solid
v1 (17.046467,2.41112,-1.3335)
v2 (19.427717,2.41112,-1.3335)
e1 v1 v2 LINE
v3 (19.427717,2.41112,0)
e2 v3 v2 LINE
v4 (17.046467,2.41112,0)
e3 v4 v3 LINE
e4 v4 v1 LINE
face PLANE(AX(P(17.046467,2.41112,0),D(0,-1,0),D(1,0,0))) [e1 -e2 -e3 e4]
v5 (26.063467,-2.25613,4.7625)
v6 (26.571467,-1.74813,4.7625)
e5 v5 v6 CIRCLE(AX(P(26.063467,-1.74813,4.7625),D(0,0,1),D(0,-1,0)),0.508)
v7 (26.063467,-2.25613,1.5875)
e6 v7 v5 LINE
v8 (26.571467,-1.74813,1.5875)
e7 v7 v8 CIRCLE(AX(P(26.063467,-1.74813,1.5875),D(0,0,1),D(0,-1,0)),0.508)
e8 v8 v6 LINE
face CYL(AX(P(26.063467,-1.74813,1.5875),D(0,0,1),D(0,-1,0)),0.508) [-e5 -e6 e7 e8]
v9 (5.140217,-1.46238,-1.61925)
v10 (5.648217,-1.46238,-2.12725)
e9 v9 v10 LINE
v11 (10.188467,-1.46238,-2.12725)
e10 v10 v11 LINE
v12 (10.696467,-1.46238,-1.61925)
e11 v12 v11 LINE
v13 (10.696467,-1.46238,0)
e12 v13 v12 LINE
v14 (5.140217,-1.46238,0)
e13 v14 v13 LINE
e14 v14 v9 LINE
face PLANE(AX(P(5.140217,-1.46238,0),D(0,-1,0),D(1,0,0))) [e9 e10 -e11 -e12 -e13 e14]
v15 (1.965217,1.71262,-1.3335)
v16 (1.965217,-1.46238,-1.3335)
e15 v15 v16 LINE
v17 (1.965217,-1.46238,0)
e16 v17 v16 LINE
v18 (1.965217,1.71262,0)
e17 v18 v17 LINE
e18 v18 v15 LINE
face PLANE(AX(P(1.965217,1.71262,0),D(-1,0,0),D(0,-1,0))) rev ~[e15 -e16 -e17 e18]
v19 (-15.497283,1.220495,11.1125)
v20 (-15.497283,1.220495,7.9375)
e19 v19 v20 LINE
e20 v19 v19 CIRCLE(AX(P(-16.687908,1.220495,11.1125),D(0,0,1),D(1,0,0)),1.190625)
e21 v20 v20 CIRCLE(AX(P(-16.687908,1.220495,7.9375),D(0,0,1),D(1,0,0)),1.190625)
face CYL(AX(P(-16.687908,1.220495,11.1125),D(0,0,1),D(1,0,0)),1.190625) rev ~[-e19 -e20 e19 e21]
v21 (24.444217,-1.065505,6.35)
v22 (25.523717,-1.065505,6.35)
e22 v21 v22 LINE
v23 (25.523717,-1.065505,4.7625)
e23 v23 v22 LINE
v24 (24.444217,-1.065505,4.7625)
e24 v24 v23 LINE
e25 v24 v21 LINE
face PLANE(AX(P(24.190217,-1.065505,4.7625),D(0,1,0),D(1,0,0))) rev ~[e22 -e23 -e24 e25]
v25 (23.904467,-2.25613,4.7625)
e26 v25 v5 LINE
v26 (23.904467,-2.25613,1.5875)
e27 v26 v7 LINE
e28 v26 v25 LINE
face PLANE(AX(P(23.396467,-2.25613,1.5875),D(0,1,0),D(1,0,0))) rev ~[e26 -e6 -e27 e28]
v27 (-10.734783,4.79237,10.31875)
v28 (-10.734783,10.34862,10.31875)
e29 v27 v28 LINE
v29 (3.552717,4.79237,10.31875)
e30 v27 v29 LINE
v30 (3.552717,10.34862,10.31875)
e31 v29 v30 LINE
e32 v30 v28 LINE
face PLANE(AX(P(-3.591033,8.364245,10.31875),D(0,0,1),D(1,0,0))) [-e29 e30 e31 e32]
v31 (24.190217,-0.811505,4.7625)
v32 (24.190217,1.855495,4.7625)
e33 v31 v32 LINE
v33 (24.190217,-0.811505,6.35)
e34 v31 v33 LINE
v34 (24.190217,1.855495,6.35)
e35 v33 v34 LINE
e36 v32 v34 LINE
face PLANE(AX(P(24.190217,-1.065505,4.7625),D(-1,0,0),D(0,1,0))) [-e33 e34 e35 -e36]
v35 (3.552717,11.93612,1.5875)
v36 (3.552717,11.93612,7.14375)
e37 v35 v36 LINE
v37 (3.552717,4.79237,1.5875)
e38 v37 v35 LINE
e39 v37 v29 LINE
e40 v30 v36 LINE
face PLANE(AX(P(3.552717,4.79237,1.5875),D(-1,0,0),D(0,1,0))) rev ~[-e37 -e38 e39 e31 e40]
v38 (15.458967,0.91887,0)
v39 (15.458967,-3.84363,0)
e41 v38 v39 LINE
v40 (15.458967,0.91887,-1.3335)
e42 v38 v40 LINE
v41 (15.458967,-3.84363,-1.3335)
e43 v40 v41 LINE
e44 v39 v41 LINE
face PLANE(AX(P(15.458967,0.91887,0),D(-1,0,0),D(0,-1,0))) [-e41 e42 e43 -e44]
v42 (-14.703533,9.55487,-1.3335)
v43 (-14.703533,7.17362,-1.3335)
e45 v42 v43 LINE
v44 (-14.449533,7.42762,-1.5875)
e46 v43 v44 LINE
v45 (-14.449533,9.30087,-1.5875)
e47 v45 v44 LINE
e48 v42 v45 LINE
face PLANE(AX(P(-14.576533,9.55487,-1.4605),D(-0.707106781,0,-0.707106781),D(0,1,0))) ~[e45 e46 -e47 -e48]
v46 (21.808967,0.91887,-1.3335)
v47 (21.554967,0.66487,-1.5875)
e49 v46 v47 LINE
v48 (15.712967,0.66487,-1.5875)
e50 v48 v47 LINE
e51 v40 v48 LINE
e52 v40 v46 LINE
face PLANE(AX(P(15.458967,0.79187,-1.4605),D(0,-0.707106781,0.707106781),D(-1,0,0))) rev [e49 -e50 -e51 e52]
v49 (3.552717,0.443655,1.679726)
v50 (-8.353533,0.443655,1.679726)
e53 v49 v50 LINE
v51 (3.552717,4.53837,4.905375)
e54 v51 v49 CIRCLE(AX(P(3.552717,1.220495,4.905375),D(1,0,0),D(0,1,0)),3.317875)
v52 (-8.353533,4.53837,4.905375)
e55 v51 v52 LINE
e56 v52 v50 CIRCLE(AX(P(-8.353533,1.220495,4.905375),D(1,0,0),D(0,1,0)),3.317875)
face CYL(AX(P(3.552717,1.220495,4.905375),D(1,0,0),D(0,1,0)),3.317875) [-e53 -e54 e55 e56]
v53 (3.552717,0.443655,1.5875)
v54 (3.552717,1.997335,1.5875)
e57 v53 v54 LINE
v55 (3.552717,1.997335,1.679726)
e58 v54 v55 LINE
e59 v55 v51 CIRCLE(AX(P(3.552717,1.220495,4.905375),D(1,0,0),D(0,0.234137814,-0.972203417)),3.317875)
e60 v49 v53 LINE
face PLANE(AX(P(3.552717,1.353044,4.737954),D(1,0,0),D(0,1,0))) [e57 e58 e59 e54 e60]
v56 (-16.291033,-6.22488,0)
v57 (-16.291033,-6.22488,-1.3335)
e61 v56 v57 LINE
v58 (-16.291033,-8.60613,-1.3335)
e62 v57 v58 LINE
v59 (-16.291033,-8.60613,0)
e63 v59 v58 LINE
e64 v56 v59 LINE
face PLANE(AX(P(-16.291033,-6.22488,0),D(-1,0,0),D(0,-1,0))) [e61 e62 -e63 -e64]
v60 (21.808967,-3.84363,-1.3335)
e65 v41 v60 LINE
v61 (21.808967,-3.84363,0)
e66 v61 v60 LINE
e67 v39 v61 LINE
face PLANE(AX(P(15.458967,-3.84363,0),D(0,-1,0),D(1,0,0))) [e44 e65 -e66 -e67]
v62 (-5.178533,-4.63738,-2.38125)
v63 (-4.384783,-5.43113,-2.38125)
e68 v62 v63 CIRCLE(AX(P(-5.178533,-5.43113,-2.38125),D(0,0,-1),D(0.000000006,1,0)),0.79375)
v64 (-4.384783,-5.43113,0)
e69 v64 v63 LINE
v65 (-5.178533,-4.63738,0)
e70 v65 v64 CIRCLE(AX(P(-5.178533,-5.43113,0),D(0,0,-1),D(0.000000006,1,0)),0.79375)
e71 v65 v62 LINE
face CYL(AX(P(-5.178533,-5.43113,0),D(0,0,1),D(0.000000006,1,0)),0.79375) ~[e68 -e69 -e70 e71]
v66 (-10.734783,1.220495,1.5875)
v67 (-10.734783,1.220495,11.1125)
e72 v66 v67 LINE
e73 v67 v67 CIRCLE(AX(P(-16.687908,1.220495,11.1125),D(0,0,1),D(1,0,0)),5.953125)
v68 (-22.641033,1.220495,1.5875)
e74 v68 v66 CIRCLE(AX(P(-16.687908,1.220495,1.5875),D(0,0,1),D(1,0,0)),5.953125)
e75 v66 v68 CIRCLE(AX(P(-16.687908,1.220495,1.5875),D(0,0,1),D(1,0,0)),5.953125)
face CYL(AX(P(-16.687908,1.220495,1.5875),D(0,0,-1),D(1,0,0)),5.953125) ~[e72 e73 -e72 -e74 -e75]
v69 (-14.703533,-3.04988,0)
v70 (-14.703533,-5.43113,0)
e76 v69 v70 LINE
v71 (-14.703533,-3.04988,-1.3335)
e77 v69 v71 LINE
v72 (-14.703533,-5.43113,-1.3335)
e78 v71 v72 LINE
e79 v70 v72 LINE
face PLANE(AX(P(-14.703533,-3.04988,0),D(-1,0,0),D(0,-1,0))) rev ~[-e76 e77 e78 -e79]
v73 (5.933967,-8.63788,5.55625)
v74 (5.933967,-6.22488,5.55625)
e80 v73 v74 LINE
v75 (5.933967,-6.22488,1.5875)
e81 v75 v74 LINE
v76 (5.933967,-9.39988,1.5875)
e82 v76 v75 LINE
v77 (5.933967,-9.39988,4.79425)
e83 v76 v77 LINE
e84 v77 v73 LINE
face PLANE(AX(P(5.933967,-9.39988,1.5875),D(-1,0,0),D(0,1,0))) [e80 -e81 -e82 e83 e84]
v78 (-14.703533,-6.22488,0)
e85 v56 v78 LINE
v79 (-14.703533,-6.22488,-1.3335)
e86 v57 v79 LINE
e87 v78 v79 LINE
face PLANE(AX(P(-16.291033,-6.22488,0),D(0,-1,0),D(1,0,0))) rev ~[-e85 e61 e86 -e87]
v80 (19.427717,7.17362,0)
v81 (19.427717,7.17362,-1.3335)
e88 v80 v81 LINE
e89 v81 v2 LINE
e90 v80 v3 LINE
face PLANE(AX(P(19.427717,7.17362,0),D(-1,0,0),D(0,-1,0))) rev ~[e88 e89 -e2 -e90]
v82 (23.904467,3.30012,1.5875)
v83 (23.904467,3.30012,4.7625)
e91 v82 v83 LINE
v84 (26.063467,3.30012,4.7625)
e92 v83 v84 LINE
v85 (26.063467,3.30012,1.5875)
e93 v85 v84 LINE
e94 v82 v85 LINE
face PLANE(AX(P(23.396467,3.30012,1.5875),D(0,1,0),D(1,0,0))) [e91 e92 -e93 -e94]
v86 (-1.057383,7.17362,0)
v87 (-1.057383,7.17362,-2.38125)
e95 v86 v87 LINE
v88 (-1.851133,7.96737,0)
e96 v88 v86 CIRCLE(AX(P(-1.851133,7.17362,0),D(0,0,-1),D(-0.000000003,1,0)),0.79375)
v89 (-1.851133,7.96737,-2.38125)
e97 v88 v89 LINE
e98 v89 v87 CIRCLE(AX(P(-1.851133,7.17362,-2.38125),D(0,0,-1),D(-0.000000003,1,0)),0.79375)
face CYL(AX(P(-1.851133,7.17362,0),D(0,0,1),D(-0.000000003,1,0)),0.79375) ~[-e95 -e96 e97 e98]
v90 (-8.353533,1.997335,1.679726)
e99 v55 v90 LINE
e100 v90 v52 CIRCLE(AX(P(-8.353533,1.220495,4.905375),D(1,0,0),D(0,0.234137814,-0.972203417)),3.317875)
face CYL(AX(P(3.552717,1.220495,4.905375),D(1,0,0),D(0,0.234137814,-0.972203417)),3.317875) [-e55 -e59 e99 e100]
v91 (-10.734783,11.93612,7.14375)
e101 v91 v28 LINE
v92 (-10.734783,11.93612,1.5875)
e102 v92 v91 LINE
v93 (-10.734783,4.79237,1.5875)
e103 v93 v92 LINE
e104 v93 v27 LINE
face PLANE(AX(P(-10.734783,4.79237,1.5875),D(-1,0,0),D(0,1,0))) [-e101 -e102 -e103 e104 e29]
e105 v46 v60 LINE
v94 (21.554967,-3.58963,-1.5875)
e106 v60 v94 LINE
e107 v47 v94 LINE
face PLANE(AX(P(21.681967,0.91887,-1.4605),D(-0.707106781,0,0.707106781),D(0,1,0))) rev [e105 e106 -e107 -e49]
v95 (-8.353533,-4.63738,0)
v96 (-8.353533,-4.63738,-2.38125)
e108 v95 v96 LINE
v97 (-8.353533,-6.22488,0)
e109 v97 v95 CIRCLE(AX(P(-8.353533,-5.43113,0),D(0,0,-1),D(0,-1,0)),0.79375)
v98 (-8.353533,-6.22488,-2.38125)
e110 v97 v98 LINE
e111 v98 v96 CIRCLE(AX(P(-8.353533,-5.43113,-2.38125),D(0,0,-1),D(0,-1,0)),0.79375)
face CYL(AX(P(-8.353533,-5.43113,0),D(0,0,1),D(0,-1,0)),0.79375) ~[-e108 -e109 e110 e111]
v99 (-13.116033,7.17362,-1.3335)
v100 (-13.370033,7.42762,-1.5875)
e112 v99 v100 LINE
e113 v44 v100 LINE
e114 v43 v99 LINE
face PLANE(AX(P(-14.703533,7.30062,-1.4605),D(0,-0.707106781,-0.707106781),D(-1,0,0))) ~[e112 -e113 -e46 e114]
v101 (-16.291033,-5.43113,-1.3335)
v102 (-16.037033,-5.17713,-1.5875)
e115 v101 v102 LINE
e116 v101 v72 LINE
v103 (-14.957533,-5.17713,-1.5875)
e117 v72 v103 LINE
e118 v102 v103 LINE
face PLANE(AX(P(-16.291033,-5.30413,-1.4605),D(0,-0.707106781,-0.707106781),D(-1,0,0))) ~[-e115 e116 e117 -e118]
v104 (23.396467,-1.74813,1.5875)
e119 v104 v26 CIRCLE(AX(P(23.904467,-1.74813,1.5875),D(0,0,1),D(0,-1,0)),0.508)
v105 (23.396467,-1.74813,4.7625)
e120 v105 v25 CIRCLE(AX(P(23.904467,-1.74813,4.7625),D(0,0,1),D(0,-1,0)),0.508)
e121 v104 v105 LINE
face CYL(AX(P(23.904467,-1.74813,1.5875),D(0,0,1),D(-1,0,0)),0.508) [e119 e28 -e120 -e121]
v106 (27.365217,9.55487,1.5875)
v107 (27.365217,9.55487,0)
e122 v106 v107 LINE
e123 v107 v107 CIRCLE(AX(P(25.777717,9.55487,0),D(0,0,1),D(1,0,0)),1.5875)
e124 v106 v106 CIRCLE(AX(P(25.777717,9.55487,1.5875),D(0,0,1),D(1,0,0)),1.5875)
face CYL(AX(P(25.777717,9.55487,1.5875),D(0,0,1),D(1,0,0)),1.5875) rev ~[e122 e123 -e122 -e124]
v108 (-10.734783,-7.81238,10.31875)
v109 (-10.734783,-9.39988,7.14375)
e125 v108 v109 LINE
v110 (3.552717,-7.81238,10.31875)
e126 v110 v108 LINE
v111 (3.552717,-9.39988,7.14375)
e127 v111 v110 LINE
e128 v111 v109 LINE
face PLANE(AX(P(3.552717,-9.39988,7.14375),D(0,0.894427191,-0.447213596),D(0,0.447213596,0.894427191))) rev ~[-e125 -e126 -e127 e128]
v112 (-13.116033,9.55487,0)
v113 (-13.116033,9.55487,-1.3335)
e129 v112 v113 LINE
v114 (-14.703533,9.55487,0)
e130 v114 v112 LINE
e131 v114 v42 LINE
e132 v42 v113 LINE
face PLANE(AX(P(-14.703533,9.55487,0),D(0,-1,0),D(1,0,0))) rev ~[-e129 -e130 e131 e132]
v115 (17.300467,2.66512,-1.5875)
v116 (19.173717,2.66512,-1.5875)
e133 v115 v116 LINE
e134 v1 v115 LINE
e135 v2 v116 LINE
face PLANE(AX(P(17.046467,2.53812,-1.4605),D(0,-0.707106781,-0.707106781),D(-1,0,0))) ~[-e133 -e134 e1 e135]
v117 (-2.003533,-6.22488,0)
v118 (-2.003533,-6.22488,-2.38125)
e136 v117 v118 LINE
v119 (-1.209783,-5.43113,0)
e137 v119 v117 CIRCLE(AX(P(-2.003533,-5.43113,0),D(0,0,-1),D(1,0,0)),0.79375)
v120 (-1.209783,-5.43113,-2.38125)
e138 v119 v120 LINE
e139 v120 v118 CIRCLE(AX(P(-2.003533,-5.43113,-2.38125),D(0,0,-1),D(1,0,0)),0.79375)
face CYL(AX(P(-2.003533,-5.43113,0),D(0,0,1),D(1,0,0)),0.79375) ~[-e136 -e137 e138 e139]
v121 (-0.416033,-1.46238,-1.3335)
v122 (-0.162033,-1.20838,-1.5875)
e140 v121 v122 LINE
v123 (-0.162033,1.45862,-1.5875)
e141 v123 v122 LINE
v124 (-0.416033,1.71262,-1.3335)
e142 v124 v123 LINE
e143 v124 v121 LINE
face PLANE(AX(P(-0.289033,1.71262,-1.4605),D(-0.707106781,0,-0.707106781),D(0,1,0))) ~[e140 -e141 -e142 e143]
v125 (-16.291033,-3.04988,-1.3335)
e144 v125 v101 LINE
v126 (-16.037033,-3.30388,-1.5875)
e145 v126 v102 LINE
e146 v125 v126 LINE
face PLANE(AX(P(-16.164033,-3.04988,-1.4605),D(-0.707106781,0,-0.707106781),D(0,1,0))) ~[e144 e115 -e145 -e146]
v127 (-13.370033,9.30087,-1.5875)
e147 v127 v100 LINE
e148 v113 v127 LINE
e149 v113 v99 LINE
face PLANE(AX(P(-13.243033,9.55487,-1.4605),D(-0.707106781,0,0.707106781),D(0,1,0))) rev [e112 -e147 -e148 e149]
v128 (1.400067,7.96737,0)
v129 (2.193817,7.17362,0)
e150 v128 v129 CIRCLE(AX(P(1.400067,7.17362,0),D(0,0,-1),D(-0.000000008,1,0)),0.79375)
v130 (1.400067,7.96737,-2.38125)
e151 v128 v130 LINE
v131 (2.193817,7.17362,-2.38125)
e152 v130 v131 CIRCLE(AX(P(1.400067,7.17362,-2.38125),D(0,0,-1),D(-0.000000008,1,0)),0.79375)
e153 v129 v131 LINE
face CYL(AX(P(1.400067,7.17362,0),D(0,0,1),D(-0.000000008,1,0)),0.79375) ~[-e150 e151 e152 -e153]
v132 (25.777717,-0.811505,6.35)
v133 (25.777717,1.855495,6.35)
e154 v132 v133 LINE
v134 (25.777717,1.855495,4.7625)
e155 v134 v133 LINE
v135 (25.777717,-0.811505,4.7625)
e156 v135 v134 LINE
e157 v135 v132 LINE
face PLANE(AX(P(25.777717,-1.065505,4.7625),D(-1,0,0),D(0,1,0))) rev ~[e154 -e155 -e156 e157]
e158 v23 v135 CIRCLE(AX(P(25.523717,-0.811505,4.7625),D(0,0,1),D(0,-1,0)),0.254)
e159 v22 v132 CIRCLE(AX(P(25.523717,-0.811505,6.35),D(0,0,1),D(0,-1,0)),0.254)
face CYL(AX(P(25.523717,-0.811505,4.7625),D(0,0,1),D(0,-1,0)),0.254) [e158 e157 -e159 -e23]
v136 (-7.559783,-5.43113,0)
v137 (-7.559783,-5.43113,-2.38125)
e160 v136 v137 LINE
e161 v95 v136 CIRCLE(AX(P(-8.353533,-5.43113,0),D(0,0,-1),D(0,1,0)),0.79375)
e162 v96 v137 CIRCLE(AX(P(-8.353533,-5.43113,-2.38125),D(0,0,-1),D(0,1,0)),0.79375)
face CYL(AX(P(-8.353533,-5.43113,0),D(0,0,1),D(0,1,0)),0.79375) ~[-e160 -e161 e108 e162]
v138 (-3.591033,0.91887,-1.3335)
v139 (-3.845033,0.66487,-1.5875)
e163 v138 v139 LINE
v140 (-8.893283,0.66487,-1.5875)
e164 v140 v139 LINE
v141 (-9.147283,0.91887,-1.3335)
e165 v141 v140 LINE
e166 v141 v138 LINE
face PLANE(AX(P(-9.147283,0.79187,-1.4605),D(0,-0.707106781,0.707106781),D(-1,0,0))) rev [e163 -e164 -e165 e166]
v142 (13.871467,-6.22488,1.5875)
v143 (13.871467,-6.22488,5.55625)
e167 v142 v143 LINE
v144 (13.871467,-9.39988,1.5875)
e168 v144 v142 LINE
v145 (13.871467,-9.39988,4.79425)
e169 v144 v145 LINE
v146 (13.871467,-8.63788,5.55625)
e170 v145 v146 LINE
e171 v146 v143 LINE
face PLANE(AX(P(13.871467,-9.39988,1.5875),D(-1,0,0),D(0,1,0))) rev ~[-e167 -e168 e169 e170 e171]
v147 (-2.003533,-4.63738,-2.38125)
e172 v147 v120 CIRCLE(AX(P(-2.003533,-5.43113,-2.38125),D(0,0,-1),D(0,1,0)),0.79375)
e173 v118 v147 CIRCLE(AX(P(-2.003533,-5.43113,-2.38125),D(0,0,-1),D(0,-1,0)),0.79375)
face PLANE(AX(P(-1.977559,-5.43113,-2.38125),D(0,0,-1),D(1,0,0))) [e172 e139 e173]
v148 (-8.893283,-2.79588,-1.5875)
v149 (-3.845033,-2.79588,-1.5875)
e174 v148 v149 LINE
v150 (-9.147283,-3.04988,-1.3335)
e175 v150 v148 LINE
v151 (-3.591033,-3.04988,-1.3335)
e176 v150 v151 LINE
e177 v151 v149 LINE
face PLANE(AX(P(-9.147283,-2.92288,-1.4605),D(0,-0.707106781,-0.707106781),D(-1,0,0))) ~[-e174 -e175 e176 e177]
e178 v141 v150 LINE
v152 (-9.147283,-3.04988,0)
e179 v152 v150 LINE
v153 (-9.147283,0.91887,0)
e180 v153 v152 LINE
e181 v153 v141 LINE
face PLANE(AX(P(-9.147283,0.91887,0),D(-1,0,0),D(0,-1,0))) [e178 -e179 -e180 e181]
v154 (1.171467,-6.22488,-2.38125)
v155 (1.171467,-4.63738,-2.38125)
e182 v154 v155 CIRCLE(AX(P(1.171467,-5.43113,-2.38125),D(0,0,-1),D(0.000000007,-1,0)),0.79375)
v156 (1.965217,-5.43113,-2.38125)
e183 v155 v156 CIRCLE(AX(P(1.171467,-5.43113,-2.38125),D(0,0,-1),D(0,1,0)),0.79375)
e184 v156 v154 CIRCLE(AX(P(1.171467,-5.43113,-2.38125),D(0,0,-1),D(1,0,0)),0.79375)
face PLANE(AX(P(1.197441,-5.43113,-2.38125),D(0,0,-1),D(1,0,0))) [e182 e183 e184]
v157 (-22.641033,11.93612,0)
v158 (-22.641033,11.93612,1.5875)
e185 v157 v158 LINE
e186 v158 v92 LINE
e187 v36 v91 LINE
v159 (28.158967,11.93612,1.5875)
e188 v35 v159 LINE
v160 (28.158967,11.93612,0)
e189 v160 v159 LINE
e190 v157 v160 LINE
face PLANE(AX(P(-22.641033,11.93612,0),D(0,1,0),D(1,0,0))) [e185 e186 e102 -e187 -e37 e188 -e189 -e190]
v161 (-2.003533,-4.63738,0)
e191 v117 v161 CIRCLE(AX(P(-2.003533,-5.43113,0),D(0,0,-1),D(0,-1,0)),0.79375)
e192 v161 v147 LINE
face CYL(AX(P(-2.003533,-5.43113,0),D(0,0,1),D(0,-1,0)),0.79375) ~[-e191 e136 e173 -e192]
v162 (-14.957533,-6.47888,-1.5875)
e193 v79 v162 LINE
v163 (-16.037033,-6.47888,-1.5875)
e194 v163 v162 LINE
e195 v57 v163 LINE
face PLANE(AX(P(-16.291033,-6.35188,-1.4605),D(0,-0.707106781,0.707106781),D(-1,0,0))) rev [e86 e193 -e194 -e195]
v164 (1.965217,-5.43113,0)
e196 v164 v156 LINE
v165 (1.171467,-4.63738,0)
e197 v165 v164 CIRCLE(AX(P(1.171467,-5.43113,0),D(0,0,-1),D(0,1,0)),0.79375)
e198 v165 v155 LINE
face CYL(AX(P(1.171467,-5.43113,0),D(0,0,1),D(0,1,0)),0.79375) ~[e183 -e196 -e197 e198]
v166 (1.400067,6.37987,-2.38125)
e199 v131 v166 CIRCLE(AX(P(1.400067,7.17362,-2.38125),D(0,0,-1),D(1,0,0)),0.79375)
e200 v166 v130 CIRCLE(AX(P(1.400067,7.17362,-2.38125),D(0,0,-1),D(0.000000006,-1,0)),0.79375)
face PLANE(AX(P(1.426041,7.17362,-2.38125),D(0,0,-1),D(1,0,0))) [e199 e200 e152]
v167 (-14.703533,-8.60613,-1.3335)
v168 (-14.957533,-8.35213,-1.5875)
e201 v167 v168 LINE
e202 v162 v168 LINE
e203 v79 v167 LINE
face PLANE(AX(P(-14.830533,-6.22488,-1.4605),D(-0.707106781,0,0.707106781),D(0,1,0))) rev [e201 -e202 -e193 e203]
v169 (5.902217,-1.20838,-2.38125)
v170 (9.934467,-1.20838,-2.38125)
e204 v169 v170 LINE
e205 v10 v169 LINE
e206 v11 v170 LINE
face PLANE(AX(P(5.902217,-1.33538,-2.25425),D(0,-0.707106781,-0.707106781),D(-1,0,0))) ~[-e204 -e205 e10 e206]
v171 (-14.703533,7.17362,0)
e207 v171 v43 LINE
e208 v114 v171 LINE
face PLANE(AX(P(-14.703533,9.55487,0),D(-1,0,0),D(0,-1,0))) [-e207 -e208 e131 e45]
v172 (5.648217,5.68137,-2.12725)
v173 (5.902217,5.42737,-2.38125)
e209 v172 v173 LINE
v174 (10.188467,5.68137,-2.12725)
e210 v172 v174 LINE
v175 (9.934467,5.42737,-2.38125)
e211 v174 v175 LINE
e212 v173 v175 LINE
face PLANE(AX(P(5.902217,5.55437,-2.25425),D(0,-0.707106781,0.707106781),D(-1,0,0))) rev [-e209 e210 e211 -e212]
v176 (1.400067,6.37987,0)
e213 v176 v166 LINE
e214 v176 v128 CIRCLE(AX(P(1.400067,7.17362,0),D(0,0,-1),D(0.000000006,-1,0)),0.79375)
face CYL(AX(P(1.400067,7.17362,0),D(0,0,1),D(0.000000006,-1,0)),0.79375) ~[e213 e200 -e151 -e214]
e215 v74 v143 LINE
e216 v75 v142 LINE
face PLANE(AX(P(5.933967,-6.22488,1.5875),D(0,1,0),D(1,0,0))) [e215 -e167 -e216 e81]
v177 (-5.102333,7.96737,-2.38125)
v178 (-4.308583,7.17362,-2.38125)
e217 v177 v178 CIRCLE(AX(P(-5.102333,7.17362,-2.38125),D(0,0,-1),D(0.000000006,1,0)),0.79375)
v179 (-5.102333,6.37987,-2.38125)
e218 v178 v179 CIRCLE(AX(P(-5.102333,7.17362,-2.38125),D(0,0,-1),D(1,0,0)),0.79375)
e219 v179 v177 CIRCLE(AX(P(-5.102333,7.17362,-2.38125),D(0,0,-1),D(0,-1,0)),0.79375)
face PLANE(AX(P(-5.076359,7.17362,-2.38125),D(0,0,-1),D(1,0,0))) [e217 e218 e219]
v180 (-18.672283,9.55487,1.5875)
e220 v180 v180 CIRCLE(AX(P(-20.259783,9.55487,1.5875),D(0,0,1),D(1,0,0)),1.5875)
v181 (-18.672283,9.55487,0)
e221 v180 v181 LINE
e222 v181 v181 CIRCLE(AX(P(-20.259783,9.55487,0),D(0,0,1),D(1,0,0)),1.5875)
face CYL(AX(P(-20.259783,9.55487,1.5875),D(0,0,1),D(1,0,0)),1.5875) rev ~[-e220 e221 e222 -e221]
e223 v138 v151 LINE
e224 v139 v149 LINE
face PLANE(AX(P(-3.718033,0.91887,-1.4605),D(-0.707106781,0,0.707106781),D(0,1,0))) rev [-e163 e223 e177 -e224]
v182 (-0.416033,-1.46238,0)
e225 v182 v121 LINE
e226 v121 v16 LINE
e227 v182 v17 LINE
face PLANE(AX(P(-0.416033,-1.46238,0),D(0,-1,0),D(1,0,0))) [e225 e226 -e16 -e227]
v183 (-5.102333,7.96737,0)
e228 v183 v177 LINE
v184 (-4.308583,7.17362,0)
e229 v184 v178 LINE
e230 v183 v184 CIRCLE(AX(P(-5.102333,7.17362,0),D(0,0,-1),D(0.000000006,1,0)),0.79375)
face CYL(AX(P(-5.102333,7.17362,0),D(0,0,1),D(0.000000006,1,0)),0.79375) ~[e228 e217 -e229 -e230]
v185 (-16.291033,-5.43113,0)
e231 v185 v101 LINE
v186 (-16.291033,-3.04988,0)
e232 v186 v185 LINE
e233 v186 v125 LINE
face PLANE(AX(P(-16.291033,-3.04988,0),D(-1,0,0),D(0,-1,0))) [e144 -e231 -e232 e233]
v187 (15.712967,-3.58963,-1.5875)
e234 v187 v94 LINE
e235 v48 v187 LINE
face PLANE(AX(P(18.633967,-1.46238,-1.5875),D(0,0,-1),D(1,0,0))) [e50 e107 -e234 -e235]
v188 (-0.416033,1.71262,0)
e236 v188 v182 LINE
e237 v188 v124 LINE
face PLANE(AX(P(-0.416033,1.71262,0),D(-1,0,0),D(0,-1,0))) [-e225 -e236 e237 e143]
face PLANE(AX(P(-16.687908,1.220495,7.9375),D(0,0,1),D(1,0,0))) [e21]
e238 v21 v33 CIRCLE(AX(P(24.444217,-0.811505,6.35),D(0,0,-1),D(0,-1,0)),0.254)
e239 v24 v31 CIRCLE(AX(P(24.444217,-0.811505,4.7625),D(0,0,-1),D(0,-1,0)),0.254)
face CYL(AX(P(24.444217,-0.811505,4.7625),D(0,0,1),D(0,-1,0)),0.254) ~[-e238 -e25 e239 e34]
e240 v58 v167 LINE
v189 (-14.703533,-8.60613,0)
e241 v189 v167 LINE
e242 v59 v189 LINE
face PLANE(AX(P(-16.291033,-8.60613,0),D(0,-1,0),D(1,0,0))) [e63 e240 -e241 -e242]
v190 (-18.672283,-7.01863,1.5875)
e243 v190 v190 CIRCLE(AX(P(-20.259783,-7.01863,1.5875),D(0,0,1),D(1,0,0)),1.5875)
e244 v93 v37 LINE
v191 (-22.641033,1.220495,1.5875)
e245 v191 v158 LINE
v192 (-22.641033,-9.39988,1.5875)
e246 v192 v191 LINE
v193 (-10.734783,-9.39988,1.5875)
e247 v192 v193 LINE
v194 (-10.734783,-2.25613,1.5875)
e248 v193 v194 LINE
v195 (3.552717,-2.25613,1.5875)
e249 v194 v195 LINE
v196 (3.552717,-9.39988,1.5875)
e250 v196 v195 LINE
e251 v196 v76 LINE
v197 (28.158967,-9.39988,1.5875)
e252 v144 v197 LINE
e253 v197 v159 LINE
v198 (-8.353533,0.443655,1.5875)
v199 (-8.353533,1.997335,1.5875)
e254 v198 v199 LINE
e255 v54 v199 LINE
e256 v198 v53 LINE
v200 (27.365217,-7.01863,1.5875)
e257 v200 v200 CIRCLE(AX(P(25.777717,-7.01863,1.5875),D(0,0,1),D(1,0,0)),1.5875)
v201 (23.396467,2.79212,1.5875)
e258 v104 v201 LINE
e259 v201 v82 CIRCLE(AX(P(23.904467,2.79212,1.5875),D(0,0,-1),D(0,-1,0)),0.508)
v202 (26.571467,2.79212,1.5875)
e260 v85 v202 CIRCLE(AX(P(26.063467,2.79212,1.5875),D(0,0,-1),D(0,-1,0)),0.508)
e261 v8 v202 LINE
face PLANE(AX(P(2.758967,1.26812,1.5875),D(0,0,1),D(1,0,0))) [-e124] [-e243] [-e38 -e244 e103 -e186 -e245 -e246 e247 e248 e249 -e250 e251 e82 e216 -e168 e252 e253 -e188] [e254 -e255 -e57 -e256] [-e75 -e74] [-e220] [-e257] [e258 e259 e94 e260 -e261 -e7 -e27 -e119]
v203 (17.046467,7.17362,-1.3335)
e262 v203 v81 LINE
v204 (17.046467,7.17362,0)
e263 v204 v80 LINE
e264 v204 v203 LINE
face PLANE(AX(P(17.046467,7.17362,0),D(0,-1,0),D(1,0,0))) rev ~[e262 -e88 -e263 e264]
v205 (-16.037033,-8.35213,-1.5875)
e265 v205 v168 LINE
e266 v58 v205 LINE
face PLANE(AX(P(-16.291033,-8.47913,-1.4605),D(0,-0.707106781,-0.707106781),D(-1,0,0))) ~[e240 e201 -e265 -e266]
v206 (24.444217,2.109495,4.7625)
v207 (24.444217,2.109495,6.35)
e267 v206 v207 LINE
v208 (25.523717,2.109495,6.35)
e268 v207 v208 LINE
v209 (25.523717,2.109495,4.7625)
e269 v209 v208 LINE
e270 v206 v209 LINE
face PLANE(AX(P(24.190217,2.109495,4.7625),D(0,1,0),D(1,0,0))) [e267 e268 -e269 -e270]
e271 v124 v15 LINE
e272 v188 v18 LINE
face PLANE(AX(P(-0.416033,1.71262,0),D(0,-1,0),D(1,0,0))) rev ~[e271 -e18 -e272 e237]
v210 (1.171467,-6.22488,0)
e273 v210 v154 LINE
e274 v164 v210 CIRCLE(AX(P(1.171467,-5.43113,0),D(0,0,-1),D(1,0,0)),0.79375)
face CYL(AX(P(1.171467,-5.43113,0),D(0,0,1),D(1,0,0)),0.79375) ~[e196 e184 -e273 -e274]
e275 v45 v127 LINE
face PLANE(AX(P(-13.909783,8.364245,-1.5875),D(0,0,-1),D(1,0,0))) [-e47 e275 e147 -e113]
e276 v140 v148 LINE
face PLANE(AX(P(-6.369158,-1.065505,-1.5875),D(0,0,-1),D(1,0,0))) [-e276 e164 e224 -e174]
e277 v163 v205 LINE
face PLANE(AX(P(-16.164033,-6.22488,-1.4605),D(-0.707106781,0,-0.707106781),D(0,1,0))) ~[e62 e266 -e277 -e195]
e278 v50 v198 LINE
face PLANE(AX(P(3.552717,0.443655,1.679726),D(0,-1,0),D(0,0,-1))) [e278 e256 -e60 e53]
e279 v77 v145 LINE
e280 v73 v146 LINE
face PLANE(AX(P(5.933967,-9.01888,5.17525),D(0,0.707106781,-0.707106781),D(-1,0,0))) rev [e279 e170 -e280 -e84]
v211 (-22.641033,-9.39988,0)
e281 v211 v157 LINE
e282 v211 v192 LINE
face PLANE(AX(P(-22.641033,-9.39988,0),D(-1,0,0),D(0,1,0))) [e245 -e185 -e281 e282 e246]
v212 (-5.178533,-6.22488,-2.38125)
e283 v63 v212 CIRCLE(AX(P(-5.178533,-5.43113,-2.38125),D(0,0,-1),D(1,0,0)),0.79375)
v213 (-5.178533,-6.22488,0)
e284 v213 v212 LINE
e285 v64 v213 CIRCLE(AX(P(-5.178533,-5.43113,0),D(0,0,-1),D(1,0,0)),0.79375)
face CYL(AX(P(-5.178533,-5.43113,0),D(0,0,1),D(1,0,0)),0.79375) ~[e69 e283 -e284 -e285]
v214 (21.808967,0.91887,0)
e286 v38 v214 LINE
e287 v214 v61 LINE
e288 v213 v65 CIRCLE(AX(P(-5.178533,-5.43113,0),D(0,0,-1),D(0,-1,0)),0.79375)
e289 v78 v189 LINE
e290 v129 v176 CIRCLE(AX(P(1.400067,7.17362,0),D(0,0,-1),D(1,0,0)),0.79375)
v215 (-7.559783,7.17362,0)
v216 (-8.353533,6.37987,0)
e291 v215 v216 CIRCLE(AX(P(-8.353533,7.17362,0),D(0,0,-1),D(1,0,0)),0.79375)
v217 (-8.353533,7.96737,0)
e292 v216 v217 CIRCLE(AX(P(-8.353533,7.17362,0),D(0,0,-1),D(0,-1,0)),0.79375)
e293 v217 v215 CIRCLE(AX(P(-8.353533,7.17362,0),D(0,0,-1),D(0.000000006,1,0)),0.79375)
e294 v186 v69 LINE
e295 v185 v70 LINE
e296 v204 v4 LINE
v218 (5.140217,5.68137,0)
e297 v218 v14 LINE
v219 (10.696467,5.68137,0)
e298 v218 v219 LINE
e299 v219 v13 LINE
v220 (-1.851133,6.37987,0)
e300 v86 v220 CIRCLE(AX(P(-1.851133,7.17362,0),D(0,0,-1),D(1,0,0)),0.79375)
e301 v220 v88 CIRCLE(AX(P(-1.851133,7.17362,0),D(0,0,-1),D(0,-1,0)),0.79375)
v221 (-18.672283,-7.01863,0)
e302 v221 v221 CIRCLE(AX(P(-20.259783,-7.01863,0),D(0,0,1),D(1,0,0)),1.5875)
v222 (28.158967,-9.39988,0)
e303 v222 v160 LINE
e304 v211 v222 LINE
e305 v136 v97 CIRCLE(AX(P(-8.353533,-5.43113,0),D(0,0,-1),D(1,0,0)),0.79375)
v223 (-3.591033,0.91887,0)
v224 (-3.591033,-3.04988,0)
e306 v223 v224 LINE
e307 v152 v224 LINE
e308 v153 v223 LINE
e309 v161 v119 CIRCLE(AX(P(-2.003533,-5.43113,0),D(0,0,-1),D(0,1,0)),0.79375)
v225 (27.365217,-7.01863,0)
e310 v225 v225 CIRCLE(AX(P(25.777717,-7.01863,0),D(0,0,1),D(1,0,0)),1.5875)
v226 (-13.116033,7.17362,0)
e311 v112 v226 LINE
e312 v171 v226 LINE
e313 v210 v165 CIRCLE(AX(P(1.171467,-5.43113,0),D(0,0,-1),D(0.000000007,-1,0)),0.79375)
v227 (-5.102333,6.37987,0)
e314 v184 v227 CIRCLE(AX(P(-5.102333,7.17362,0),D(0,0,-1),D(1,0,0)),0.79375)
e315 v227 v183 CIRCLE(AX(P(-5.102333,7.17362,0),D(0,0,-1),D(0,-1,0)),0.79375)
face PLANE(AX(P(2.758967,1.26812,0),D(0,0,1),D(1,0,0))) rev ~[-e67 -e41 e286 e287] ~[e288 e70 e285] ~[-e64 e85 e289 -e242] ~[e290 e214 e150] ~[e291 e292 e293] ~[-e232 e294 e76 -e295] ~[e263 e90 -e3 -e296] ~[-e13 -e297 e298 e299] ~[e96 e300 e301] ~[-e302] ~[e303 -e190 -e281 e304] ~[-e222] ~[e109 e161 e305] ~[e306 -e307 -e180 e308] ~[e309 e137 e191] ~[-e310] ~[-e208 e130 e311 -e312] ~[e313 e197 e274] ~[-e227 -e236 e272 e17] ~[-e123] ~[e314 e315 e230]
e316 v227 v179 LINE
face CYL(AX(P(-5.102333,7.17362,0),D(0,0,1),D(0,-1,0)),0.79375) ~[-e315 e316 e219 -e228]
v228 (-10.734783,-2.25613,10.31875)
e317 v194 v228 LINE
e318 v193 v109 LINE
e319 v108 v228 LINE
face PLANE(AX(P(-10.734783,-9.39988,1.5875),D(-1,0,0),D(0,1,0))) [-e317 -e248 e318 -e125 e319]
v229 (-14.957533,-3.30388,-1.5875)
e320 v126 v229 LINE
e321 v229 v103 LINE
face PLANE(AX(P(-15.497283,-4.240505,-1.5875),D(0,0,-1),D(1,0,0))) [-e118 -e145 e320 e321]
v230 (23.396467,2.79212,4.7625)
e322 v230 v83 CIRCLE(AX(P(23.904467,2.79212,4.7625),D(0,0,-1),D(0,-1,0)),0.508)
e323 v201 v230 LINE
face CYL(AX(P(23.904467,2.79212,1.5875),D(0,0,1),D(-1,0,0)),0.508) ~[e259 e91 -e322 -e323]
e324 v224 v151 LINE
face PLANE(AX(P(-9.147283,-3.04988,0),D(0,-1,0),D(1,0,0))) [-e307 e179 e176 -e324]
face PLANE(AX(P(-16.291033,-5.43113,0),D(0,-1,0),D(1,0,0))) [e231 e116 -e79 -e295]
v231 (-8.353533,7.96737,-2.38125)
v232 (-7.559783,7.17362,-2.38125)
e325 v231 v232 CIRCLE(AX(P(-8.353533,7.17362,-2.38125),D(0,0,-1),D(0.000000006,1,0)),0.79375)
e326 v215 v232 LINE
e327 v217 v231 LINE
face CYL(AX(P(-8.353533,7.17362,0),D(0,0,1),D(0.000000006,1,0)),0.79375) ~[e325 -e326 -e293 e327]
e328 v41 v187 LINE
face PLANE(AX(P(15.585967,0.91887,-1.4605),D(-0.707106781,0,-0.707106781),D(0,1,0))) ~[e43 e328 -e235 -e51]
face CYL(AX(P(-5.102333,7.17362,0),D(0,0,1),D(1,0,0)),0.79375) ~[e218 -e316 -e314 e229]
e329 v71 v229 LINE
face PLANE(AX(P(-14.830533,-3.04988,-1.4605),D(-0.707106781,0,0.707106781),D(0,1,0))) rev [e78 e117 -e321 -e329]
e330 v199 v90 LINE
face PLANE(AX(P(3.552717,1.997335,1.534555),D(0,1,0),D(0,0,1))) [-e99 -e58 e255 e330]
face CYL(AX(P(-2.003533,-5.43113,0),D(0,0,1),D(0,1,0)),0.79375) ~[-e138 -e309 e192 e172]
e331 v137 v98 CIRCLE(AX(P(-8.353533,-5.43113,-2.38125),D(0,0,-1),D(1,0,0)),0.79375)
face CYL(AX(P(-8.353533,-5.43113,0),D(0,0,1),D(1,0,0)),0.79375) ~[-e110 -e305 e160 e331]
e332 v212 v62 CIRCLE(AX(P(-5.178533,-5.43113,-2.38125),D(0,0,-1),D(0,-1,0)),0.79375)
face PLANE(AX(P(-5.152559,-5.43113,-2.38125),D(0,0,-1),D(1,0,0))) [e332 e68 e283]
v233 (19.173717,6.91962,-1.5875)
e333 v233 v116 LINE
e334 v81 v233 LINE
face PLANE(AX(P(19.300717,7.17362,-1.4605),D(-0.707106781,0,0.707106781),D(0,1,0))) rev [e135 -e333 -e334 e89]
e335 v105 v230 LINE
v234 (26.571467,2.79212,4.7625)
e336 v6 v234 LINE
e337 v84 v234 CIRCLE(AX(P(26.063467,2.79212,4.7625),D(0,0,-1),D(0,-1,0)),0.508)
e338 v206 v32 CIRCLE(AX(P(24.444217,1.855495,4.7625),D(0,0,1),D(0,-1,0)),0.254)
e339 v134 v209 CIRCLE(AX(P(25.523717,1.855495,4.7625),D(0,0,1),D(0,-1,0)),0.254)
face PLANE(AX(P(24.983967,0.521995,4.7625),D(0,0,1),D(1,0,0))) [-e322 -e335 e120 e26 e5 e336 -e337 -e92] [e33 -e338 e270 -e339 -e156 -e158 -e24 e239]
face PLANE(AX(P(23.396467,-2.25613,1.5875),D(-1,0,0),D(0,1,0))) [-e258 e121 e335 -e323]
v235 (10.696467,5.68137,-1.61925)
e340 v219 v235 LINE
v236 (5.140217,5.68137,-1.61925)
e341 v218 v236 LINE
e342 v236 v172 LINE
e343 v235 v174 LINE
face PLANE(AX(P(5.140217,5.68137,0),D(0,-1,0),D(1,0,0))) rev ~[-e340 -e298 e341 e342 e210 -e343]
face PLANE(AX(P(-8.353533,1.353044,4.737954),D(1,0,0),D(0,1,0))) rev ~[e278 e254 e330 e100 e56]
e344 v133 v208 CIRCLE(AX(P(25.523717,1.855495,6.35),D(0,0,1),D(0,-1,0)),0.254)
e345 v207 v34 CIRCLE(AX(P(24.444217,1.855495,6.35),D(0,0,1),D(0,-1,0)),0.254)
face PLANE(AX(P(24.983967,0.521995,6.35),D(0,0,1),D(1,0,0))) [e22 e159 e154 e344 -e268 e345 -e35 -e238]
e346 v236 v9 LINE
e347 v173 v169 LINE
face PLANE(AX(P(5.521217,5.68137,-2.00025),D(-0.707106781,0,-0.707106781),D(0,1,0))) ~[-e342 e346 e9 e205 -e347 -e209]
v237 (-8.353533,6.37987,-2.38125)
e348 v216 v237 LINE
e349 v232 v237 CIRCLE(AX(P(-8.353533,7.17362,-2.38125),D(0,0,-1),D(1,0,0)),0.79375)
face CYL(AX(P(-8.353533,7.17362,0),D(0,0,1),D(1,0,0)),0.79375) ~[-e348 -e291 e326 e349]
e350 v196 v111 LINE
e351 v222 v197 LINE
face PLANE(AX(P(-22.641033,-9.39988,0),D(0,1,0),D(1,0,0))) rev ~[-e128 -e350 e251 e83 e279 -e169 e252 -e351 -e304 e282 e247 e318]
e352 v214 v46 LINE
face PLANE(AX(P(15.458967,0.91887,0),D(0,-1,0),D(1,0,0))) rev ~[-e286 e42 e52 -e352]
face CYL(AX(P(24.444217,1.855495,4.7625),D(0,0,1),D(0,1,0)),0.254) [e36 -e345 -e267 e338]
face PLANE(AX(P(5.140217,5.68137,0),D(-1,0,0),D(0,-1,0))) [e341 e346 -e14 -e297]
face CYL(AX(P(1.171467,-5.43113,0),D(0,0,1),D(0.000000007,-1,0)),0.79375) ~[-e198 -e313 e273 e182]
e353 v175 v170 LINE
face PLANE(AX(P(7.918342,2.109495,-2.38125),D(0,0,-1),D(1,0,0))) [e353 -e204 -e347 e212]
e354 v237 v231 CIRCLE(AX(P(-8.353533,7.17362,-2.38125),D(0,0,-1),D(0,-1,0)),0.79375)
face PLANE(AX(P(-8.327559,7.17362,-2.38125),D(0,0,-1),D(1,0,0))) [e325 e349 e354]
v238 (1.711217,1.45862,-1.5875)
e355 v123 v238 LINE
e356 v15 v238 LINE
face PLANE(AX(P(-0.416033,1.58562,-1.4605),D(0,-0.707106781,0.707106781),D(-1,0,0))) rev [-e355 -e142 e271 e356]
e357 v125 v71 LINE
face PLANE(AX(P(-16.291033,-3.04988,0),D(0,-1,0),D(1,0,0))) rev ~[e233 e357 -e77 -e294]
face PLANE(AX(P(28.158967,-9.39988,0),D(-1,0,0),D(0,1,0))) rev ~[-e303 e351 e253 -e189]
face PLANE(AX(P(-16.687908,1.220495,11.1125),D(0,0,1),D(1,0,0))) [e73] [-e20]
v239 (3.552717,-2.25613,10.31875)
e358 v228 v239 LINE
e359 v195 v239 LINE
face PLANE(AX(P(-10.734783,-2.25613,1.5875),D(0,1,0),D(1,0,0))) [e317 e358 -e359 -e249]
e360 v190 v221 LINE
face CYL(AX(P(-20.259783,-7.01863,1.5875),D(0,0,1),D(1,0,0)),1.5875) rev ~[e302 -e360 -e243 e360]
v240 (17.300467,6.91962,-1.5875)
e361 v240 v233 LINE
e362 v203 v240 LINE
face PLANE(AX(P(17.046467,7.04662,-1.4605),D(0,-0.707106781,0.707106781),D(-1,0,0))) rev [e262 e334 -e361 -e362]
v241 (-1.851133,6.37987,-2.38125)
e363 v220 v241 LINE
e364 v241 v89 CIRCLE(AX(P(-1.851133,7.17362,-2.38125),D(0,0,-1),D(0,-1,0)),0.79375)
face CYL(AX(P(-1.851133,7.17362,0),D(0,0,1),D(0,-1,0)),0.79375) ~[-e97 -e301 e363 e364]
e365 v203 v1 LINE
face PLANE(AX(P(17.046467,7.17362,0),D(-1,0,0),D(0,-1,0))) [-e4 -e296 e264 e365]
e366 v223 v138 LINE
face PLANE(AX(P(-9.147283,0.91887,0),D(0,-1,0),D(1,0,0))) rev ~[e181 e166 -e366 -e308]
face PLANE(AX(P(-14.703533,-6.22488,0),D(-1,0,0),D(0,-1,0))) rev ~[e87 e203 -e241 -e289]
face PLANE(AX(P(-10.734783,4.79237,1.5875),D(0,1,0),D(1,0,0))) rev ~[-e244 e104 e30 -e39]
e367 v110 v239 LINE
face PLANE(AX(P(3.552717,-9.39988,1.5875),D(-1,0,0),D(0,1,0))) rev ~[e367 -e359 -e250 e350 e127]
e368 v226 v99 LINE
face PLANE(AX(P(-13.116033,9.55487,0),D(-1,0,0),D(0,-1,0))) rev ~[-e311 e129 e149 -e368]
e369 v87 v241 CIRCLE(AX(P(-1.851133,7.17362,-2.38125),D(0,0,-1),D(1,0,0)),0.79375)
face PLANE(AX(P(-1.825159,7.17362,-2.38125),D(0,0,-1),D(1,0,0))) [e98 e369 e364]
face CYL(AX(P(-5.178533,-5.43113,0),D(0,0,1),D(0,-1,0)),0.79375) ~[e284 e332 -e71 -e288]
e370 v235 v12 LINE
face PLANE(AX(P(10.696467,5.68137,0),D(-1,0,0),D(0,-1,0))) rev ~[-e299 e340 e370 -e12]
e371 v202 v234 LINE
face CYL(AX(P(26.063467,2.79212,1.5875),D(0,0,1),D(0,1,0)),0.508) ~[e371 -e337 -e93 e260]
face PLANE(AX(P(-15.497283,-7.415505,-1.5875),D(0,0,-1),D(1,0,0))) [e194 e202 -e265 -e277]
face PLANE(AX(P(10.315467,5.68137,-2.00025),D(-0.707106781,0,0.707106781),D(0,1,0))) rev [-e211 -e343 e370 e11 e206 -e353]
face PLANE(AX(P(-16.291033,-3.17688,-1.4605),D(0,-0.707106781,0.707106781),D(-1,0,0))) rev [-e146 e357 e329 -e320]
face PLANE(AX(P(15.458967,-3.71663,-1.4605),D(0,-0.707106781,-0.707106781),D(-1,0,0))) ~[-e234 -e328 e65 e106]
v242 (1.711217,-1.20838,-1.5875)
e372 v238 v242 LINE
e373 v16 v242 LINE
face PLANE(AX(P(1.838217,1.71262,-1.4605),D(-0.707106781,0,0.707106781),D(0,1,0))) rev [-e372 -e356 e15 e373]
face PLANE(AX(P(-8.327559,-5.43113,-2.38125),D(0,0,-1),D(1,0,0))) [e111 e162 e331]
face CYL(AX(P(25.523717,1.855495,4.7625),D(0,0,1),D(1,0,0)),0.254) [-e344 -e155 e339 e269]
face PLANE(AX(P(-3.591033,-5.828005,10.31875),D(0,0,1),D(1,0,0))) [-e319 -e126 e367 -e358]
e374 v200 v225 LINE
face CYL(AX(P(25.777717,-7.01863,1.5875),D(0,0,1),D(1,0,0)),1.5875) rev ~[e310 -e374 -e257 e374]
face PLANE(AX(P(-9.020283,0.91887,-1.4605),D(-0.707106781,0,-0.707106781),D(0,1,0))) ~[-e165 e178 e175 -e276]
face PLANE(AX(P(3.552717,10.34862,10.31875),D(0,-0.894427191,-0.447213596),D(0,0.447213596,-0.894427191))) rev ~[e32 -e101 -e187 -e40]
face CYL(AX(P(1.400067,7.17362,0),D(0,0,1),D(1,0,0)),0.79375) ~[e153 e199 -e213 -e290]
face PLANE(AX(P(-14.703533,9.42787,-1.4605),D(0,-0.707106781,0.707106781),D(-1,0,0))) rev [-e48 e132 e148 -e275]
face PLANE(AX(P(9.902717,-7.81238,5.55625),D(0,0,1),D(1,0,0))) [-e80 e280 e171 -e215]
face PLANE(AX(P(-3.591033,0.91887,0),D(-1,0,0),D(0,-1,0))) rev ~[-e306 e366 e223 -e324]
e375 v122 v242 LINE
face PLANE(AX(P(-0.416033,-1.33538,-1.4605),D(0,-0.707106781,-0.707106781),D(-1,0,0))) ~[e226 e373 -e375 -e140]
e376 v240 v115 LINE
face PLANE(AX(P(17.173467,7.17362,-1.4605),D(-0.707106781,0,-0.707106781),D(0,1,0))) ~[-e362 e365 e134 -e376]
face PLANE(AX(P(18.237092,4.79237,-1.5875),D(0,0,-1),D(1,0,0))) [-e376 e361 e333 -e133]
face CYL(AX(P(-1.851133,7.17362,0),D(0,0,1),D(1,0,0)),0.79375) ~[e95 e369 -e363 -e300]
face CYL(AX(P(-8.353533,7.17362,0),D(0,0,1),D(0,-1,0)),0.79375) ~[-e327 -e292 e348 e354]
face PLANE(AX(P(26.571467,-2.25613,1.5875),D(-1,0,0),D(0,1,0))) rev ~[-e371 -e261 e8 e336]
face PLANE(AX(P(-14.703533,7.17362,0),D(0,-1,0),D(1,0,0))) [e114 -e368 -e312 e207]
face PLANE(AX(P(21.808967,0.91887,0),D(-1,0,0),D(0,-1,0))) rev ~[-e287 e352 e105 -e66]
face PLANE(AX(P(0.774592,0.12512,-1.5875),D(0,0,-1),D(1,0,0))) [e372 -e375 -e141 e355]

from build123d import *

# Parameters (mm, degrees)
F0_W      = 50.8
F0_H      = 21.336
F1_DEPTH  = 1.5875
F2_R      = 1.5875
F3_DEPTH  = 3.175
F5_DEPTH  = 2.38125
F6_W      = 1.5875
F6_H      = 2.38125
F6_W_2    = 5.55625
F6_H_2    = 3.96875
F6_W_3    = 2.38125
F6_H_3    = 3.175
F6_W_4    = 6.35
F6_H_4    = 4.7625
F7_DEPTH  = 1.5875
F8_SIZE   = 0.254
F9_W      = 5.55625
F9_H      = 7.14375
F10_DEPTH = 2.38125
F11_SIZE  = 0.762
F12_SIZE  = 0.254
F13_R     = 5.953125
F14_DEPTH = 9.525
F15_R     = 1.190625
F16_DEPTH = 3.175
F17_W     = 14.2875
F17_H     = 7.14375
F18_DEPTH = 8.73125
F20_DEPTH = 15.24
F22_DEPTH = 11.90625
F23_W     = 3.175
F23_H     = 5.55625
F24_DEPTH = 3.175
F25_W     = 1.5875
F25_H     = 3.175
F26_DEPTH = 1.5875
F27_R     = 0.254
F28_R     = 0.508
F29_W     = 7.9375
F29_H     = 3.175
F30_DEPTH = 3.96875
F31_SIZE  = 0.762


# Not quite as in the source:
# - a length typed as a fraction of an inch, garbled in the dataset ("3 / 203.2 mm" for 3/8 in), is restored


with BuildPart() as f1:
    # F0 (on Top) → F1 (new body)
    with BuildSketch(Plane.XY):
        with Locations((2.7589667588, 1.2681204271)):
            Rectangle(F0_W, F0_H)
    extrude(amount=F1_DEPTH)

    # F2 (on face) → F3 (cut)
    with BuildSketch(Plane.XY.offset(1.5875)):
        with Locations((25.7777167588, -7.0186295729)):
            Circle(F2_R)
        with Locations((25.7777167588, 9.5548704271)):
            Circle(F2_R)
        with Locations((-20.2597832412, 9.5548704271)):
            Circle(F2_R)
        with Locations((-20.2597832412, -7.0186295729)):
            Circle(F2_R)
    extrude(amount=-F3_DEPTH, mode=Mode.SUBTRACT)

    # F4 (on face) → F5 (join)
    with BuildSketch(Plane(origin=(0, 0, 0), x_dir=(1, 0, 0), z_dir=(0, 0, -1))):
        with BuildLine():
            ThreePointArc((-5.1785332412, 6.2248795729), (-5.9722832412, 5.4311295706), (-5.1785332365, 4.6373795729))
            ThreePointArc((-5.1785332365, 4.6373795729), (-4.6172672319, 4.869863567), (-4.3847832412, 5.4311295729))
            ThreePointArc((-4.3847832412, 5.4311295729), (-4.6172672336, 5.9923955805), (-5.1785332412, 6.2248795729))
        make_face()
        with BuildLine():
            ThreePointArc((-2.0035332412, 6.2248795729), (-2.7972832412, 5.4311295729), (-2.0035332412, 4.6373795729))
            ThreePointArc((-2.0035332412, 4.6373795729), (-1.4422672336, 4.8698635653), (-1.2097832412, 5.4311295729))
            ThreePointArc((-1.2097832412, 5.4311295729), (-1.4422672336, 5.9923955805), (-2.0035332412, 6.2248795729))
        make_face()
        with BuildLine():
            ThreePointArc((1.1714667642, 6.2248795729), (0.3777167588, 5.4311295756), (1.1714667588, 4.6373795729))
            ThreePointArc((1.1714667588, 4.6373795729), (1.7327327664, 4.8698635653), (1.9652167588, 5.4311295729))
            ThreePointArc((1.9652167588, 5.4311295729), (1.7327327683, 5.9923955786), (1.1714667642, 6.2248795729))
        make_face()
        with BuildLine():
            ThreePointArc((-7.5597832412, -7.1736204271), (-7.7922672336, -6.6123544195), (-8.3535332412, -6.3798704271))
            ThreePointArc((-8.3535332412, -6.3798704271), (-9.1472832412, -7.1736204294), (-8.3535332365, -7.9673704271))
            ThreePointArc((-8.3535332365, -7.9673704271), (-7.7922672319, -7.734886433), (-7.5597832412, -7.1736204271))
        make_face()
        with BuildLine():
            ThreePointArc((-4.3085832412, -7.1736204271), (-4.5410672336, -6.6123544195), (-5.1023332412, -6.3798704271))
            ThreePointArc((-5.1023332412, -6.3798704271), (-5.8960832412, -7.1736204294), (-5.1023332365, -7.9673704271))
            ThreePointArc((-5.1023332365, -7.9673704271), (-4.5410672319, -7.734886433), (-4.3085832412, -7.1736204271))
        make_face()
        with BuildLine():
            ThreePointArc((-1.0573832412, -7.1736204271), (-1.2898672336, -6.6123544195), (-1.8511332412, -6.3798704271))
            ThreePointArc((-1.8511332412, -6.3798704271), (-2.6448832412, -7.173620426), (-1.8511332433, -7.9673704271))
            ThreePointArc((-1.8511332433, -7.9673704271), (-1.2898672344, -7.7348864354), (-1.0573832412, -7.1736204271))
        make_face()
        with BuildLine():
            ThreePointArc((2.1938167588, -7.1736204271), (1.9613327682, -6.6123544213), (1.4000667639, -6.3798704271))
            ThreePointArc((1.4000667639, -6.3798704271), (0.6063167588, -7.1736204215), (1.4000667527, -7.9673704271))
            ThreePointArc((1.4000667527, -7.9673704271), (1.9613327642, -7.7348864368), (2.1938167588, -7.1736204271))
        make_face()
        with BuildLine():
            ThreePointArc((-8.3535332412, 6.2248795729), (-9.1472832412, 5.4311295729), (-8.3535332412, 4.6373795729))
            ThreePointArc((-8.3535332412, 4.6373795729), (-7.7922672336, 4.8698635653), (-7.5597832412, 5.4311295729))
            ThreePointArc((-7.5597832412, 5.4311295729), (-7.7922672336, 5.9923955805), (-8.3535332412, 6.2248795729))
        make_face()
    extrude(amount=F5_DEPTH)

    # F6 (on face) → F7 (join)
    with BuildSketch(Plane(origin=(0, 0, 0), x_dir=(1, 0, 0), z_dir=(0, 0, -1))):
        with Locations((-15.4972832412, 7.4155045729)):
            Rectangle(F6_W, F6_H)
        with Locations((-15.4972832412, 4.2405045729)):
            Rectangle(F6_W, F6_H)
        with Locations((-13.9097832412, -8.3642454271)):
            Rectangle(F6_W, F6_H)
        with Locations((-6.3691582412, 1.0655045729)):
            Rectangle(F6_W_2, F6_H_2)
        with Locations((0.7745917588, -0.1251204271)):
            Rectangle(F6_W_3, F6_H_3)
        with Locations((18.6339667588, 1.4623795729)):
            Rectangle(F6_W_4, F6_H_4)
        with Locations((18.2370917588, -4.7923704271)):
            Rectangle(F6_W_3, F6_H_4)
    extrude(amount=F7_DEPTH)

    # F8
    f8_edges = [f1.edges().sort_by_distance(p)[0] for p in [
        (-13.909783, 9.55487, -1.5875),
        (-13.116033, 8.364245, -1.5875),
        (-13.909783, 7.17362, -1.5875),
        (-14.703533, 8.364245, -1.5875),
        (-15.497283, -5.43113, -1.5875),
        (-16.291033, -4.240505, -1.5875),
        (-15.497283, -3.04988, -1.5875),
        (-14.703533, -4.240505, -1.5875),
        (-15.497283, -8.60613, -1.5875),
        (-16.291033, -7.415505, -1.5875),
        (-15.497283, -6.22488, -1.5875),
        (-14.703533, -7.415505, -1.5875),
        (-3.591033, -1.065505, -1.5875),
        (-6.369158, -3.04988, -1.5875),
        (-9.147283, -1.065505, -1.5875),
        (-6.369158, 0.91887, -1.5875),
        (0.774592, 1.71262, -1.5875),
        (1.965217, 0.12512, -1.5875),
        (0.774592, -1.46238, -1.5875),
        (-0.416033, 0.12512, -1.5875),
        (18.633967, 0.91887, -1.5875),
        (21.808967, -1.46238, -1.5875),
        (18.633967, -3.84363, -1.5875),
        (15.458967, -1.46238, -1.5875),
        (19.427717, 4.79237, -1.5875),
        (18.237092, 2.41112, -1.5875),
        (17.046467, 4.79237, -1.5875),
        (18.237092, 7.17362, -1.5875),
    ]]
    chamfer(f8_edges, length=F8_SIZE)

    # F9 (on face) → F10 (join)
    with BuildSketch(Plane(origin=(0, 0, 0), x_dir=(1, 0, 0), z_dir=(0, 0, -1))):
        with Locations((7.9183417588, -2.1094954271)):
            Rectangle(F9_W, F9_H)
    extrude(amount=F10_DEPTH)

    # F11
    f11_edges = [f1.edges().sort_by_distance(p)[0] for p in [
        (10.696467, 2.109495, -2.38125),
        (5.140217, 2.109495, -2.38125),
    ]]
    chamfer(f11_edges, length=F11_SIZE)

    # F12
    f12_edges = [f1.edges().sort_by_distance(p)[0] for p in [
        (7.918342, -1.46238, -2.38125),
        (7.918342, 5.68137, -2.38125),
    ]]
    chamfer(f12_edges, length=F12_SIZE)

    # F13 (on face) → F14 (join)
    with BuildSketch(Plane.XY.offset(1.5875)):
        with Locations((-16.6879082412, 1.2204954271)):
            Circle(F13_R)
    extrude(amount=F14_DEPTH)

    # F15 (on face) → F16 (cut)
    with BuildSketch(Plane.XY.offset(11.1125)):
        with Locations((-16.6879082412, 1.2204954271)):
            Circle(F15_R)
    extrude(amount=-F16_DEPTH, mode=Mode.SUBTRACT)

    # F17 (on face) → F18 (join)
    with BuildSketch(Plane.XY.offset(1.5875)):
        with Locations((-3.5910332412, 8.3642454271)):
            Rectangle(F17_W, F17_H)
        with Locations((-3.5910332412, -5.8280045729)):
            Rectangle(F17_W, F17_H)
    extrude(amount=F18_DEPTH)

    # F19 (on face) → F20 (cut)
    with BuildSketch(Plane.YZ.offset(3.5527167588)):
        Polygon((-12.6245096326, 12.3970924459), (-9.3998795729, 7.14375), (-7.8123795729, 10.31875), (-6.8544447422, 13.4305364035), align=None)
        Polygon((11.640425374, 13.160722746), (10.3486204271, 10.31875), (11.9361204271, 7.14375), (15.5531742786, 9.6412404954), (16.3770463069, 13.6774447247), align=None)
    extrude(amount=-F20_DEPTH, mode=Mode.SUBTRACT)

    # F21 (on face) → F22 (join)
    with BuildSketch(Plane.YZ.offset(3.5527167588)):
        with BuildLine():
            ThreePointArc((1.9973354259, 1.6797255876), (3.8268101171, 2.8522266244), (4.5383704271, 4.905375))
            ThreePointArc((4.5383704271, 4.905375), (-0.8326529485, 7.51168969), (0.4436554283, 1.6797255876))
            Line((0.4436554283, 1.6797255876), (1.9973354259, 1.6797255876))
        make_face()
        with BuildLine():
            Line((1.9973354259, 1.6797255876), (0.4436554283, 1.6797255876))
            ThreePointArc((0.4436554283, 1.6797255876), (1.2204954271, 1.5875), (1.9973354259, 1.6797255876))
        make_face()
        with BuildLine():
            ThreePointArc((1.9973354259, 1.6797255876), (1.2204954271, 1.5875), (0.4436554283, 1.6797255876))
            Line((0.4436554283, 1.6797255876), (0.4436554283, 1.5345554566))
            Line((0.4436554283, 1.5345554566), (1.9973354259, 1.5345554566))
            Line((1.9973354259, 1.5345554566), (1.9973354259, 1.6797255876))
        make_face()
    extrude(amount=-F22_DEPTH)

    # F23 (on face) → F24 (join)
    with BuildSketch(Plane.XY.offset(1.5875)):
        with Locations((24.9839667588, 0.5219954271)):
            Rectangle(F23_W, F23_H)
    extrude(amount=F24_DEPTH)

    # F25 (on face) → F26 (join)
    with BuildSketch(Plane.XY.offset(4.7625)):
        with Locations((24.9839667588, 0.5219954271)):
            Rectangle(F25_W, F25_H)
    extrude(amount=F26_DEPTH)

    # F27
    f27_edges = [f1.edges().sort_by_distance(p)[0] for p in [
        (25.777717, -1.065505, 5.55625),
        (24.190217, -1.065505, 5.55625),
        (24.190217, 2.109495, 5.55625),
        (25.777717, 2.109495, 5.55625),
    ]]
    fillet(f27_edges, radius=F27_R)

    # F28
    f28_edges = [f1.edges().sort_by_distance(p)[0] for p in [
        (26.571467, 3.30012, 3.175),
        (23.396467, 3.30012, 3.175),
        (26.571467, -2.25613, 3.175),
        (23.396467, -2.25613, 3.175),
    ]]
    fillet(f28_edges, radius=F28_R)

    # F29 (on face) → F30 (join)
    with BuildSketch(Plane.XY.offset(1.5875)):
        with Locations((9.9027167588, -7.8123795729)):
            Rectangle(F29_W, F29_H)
    extrude(amount=F30_DEPTH)

    # F31
    f31_edges = [f1.edges().sort_by_distance(p)[0] for p in [
        (9.902717, -9.39988, 5.55625),
    ]]
    chamfer(f31_edges, length=F31_SIZE)


solid = f1.part
